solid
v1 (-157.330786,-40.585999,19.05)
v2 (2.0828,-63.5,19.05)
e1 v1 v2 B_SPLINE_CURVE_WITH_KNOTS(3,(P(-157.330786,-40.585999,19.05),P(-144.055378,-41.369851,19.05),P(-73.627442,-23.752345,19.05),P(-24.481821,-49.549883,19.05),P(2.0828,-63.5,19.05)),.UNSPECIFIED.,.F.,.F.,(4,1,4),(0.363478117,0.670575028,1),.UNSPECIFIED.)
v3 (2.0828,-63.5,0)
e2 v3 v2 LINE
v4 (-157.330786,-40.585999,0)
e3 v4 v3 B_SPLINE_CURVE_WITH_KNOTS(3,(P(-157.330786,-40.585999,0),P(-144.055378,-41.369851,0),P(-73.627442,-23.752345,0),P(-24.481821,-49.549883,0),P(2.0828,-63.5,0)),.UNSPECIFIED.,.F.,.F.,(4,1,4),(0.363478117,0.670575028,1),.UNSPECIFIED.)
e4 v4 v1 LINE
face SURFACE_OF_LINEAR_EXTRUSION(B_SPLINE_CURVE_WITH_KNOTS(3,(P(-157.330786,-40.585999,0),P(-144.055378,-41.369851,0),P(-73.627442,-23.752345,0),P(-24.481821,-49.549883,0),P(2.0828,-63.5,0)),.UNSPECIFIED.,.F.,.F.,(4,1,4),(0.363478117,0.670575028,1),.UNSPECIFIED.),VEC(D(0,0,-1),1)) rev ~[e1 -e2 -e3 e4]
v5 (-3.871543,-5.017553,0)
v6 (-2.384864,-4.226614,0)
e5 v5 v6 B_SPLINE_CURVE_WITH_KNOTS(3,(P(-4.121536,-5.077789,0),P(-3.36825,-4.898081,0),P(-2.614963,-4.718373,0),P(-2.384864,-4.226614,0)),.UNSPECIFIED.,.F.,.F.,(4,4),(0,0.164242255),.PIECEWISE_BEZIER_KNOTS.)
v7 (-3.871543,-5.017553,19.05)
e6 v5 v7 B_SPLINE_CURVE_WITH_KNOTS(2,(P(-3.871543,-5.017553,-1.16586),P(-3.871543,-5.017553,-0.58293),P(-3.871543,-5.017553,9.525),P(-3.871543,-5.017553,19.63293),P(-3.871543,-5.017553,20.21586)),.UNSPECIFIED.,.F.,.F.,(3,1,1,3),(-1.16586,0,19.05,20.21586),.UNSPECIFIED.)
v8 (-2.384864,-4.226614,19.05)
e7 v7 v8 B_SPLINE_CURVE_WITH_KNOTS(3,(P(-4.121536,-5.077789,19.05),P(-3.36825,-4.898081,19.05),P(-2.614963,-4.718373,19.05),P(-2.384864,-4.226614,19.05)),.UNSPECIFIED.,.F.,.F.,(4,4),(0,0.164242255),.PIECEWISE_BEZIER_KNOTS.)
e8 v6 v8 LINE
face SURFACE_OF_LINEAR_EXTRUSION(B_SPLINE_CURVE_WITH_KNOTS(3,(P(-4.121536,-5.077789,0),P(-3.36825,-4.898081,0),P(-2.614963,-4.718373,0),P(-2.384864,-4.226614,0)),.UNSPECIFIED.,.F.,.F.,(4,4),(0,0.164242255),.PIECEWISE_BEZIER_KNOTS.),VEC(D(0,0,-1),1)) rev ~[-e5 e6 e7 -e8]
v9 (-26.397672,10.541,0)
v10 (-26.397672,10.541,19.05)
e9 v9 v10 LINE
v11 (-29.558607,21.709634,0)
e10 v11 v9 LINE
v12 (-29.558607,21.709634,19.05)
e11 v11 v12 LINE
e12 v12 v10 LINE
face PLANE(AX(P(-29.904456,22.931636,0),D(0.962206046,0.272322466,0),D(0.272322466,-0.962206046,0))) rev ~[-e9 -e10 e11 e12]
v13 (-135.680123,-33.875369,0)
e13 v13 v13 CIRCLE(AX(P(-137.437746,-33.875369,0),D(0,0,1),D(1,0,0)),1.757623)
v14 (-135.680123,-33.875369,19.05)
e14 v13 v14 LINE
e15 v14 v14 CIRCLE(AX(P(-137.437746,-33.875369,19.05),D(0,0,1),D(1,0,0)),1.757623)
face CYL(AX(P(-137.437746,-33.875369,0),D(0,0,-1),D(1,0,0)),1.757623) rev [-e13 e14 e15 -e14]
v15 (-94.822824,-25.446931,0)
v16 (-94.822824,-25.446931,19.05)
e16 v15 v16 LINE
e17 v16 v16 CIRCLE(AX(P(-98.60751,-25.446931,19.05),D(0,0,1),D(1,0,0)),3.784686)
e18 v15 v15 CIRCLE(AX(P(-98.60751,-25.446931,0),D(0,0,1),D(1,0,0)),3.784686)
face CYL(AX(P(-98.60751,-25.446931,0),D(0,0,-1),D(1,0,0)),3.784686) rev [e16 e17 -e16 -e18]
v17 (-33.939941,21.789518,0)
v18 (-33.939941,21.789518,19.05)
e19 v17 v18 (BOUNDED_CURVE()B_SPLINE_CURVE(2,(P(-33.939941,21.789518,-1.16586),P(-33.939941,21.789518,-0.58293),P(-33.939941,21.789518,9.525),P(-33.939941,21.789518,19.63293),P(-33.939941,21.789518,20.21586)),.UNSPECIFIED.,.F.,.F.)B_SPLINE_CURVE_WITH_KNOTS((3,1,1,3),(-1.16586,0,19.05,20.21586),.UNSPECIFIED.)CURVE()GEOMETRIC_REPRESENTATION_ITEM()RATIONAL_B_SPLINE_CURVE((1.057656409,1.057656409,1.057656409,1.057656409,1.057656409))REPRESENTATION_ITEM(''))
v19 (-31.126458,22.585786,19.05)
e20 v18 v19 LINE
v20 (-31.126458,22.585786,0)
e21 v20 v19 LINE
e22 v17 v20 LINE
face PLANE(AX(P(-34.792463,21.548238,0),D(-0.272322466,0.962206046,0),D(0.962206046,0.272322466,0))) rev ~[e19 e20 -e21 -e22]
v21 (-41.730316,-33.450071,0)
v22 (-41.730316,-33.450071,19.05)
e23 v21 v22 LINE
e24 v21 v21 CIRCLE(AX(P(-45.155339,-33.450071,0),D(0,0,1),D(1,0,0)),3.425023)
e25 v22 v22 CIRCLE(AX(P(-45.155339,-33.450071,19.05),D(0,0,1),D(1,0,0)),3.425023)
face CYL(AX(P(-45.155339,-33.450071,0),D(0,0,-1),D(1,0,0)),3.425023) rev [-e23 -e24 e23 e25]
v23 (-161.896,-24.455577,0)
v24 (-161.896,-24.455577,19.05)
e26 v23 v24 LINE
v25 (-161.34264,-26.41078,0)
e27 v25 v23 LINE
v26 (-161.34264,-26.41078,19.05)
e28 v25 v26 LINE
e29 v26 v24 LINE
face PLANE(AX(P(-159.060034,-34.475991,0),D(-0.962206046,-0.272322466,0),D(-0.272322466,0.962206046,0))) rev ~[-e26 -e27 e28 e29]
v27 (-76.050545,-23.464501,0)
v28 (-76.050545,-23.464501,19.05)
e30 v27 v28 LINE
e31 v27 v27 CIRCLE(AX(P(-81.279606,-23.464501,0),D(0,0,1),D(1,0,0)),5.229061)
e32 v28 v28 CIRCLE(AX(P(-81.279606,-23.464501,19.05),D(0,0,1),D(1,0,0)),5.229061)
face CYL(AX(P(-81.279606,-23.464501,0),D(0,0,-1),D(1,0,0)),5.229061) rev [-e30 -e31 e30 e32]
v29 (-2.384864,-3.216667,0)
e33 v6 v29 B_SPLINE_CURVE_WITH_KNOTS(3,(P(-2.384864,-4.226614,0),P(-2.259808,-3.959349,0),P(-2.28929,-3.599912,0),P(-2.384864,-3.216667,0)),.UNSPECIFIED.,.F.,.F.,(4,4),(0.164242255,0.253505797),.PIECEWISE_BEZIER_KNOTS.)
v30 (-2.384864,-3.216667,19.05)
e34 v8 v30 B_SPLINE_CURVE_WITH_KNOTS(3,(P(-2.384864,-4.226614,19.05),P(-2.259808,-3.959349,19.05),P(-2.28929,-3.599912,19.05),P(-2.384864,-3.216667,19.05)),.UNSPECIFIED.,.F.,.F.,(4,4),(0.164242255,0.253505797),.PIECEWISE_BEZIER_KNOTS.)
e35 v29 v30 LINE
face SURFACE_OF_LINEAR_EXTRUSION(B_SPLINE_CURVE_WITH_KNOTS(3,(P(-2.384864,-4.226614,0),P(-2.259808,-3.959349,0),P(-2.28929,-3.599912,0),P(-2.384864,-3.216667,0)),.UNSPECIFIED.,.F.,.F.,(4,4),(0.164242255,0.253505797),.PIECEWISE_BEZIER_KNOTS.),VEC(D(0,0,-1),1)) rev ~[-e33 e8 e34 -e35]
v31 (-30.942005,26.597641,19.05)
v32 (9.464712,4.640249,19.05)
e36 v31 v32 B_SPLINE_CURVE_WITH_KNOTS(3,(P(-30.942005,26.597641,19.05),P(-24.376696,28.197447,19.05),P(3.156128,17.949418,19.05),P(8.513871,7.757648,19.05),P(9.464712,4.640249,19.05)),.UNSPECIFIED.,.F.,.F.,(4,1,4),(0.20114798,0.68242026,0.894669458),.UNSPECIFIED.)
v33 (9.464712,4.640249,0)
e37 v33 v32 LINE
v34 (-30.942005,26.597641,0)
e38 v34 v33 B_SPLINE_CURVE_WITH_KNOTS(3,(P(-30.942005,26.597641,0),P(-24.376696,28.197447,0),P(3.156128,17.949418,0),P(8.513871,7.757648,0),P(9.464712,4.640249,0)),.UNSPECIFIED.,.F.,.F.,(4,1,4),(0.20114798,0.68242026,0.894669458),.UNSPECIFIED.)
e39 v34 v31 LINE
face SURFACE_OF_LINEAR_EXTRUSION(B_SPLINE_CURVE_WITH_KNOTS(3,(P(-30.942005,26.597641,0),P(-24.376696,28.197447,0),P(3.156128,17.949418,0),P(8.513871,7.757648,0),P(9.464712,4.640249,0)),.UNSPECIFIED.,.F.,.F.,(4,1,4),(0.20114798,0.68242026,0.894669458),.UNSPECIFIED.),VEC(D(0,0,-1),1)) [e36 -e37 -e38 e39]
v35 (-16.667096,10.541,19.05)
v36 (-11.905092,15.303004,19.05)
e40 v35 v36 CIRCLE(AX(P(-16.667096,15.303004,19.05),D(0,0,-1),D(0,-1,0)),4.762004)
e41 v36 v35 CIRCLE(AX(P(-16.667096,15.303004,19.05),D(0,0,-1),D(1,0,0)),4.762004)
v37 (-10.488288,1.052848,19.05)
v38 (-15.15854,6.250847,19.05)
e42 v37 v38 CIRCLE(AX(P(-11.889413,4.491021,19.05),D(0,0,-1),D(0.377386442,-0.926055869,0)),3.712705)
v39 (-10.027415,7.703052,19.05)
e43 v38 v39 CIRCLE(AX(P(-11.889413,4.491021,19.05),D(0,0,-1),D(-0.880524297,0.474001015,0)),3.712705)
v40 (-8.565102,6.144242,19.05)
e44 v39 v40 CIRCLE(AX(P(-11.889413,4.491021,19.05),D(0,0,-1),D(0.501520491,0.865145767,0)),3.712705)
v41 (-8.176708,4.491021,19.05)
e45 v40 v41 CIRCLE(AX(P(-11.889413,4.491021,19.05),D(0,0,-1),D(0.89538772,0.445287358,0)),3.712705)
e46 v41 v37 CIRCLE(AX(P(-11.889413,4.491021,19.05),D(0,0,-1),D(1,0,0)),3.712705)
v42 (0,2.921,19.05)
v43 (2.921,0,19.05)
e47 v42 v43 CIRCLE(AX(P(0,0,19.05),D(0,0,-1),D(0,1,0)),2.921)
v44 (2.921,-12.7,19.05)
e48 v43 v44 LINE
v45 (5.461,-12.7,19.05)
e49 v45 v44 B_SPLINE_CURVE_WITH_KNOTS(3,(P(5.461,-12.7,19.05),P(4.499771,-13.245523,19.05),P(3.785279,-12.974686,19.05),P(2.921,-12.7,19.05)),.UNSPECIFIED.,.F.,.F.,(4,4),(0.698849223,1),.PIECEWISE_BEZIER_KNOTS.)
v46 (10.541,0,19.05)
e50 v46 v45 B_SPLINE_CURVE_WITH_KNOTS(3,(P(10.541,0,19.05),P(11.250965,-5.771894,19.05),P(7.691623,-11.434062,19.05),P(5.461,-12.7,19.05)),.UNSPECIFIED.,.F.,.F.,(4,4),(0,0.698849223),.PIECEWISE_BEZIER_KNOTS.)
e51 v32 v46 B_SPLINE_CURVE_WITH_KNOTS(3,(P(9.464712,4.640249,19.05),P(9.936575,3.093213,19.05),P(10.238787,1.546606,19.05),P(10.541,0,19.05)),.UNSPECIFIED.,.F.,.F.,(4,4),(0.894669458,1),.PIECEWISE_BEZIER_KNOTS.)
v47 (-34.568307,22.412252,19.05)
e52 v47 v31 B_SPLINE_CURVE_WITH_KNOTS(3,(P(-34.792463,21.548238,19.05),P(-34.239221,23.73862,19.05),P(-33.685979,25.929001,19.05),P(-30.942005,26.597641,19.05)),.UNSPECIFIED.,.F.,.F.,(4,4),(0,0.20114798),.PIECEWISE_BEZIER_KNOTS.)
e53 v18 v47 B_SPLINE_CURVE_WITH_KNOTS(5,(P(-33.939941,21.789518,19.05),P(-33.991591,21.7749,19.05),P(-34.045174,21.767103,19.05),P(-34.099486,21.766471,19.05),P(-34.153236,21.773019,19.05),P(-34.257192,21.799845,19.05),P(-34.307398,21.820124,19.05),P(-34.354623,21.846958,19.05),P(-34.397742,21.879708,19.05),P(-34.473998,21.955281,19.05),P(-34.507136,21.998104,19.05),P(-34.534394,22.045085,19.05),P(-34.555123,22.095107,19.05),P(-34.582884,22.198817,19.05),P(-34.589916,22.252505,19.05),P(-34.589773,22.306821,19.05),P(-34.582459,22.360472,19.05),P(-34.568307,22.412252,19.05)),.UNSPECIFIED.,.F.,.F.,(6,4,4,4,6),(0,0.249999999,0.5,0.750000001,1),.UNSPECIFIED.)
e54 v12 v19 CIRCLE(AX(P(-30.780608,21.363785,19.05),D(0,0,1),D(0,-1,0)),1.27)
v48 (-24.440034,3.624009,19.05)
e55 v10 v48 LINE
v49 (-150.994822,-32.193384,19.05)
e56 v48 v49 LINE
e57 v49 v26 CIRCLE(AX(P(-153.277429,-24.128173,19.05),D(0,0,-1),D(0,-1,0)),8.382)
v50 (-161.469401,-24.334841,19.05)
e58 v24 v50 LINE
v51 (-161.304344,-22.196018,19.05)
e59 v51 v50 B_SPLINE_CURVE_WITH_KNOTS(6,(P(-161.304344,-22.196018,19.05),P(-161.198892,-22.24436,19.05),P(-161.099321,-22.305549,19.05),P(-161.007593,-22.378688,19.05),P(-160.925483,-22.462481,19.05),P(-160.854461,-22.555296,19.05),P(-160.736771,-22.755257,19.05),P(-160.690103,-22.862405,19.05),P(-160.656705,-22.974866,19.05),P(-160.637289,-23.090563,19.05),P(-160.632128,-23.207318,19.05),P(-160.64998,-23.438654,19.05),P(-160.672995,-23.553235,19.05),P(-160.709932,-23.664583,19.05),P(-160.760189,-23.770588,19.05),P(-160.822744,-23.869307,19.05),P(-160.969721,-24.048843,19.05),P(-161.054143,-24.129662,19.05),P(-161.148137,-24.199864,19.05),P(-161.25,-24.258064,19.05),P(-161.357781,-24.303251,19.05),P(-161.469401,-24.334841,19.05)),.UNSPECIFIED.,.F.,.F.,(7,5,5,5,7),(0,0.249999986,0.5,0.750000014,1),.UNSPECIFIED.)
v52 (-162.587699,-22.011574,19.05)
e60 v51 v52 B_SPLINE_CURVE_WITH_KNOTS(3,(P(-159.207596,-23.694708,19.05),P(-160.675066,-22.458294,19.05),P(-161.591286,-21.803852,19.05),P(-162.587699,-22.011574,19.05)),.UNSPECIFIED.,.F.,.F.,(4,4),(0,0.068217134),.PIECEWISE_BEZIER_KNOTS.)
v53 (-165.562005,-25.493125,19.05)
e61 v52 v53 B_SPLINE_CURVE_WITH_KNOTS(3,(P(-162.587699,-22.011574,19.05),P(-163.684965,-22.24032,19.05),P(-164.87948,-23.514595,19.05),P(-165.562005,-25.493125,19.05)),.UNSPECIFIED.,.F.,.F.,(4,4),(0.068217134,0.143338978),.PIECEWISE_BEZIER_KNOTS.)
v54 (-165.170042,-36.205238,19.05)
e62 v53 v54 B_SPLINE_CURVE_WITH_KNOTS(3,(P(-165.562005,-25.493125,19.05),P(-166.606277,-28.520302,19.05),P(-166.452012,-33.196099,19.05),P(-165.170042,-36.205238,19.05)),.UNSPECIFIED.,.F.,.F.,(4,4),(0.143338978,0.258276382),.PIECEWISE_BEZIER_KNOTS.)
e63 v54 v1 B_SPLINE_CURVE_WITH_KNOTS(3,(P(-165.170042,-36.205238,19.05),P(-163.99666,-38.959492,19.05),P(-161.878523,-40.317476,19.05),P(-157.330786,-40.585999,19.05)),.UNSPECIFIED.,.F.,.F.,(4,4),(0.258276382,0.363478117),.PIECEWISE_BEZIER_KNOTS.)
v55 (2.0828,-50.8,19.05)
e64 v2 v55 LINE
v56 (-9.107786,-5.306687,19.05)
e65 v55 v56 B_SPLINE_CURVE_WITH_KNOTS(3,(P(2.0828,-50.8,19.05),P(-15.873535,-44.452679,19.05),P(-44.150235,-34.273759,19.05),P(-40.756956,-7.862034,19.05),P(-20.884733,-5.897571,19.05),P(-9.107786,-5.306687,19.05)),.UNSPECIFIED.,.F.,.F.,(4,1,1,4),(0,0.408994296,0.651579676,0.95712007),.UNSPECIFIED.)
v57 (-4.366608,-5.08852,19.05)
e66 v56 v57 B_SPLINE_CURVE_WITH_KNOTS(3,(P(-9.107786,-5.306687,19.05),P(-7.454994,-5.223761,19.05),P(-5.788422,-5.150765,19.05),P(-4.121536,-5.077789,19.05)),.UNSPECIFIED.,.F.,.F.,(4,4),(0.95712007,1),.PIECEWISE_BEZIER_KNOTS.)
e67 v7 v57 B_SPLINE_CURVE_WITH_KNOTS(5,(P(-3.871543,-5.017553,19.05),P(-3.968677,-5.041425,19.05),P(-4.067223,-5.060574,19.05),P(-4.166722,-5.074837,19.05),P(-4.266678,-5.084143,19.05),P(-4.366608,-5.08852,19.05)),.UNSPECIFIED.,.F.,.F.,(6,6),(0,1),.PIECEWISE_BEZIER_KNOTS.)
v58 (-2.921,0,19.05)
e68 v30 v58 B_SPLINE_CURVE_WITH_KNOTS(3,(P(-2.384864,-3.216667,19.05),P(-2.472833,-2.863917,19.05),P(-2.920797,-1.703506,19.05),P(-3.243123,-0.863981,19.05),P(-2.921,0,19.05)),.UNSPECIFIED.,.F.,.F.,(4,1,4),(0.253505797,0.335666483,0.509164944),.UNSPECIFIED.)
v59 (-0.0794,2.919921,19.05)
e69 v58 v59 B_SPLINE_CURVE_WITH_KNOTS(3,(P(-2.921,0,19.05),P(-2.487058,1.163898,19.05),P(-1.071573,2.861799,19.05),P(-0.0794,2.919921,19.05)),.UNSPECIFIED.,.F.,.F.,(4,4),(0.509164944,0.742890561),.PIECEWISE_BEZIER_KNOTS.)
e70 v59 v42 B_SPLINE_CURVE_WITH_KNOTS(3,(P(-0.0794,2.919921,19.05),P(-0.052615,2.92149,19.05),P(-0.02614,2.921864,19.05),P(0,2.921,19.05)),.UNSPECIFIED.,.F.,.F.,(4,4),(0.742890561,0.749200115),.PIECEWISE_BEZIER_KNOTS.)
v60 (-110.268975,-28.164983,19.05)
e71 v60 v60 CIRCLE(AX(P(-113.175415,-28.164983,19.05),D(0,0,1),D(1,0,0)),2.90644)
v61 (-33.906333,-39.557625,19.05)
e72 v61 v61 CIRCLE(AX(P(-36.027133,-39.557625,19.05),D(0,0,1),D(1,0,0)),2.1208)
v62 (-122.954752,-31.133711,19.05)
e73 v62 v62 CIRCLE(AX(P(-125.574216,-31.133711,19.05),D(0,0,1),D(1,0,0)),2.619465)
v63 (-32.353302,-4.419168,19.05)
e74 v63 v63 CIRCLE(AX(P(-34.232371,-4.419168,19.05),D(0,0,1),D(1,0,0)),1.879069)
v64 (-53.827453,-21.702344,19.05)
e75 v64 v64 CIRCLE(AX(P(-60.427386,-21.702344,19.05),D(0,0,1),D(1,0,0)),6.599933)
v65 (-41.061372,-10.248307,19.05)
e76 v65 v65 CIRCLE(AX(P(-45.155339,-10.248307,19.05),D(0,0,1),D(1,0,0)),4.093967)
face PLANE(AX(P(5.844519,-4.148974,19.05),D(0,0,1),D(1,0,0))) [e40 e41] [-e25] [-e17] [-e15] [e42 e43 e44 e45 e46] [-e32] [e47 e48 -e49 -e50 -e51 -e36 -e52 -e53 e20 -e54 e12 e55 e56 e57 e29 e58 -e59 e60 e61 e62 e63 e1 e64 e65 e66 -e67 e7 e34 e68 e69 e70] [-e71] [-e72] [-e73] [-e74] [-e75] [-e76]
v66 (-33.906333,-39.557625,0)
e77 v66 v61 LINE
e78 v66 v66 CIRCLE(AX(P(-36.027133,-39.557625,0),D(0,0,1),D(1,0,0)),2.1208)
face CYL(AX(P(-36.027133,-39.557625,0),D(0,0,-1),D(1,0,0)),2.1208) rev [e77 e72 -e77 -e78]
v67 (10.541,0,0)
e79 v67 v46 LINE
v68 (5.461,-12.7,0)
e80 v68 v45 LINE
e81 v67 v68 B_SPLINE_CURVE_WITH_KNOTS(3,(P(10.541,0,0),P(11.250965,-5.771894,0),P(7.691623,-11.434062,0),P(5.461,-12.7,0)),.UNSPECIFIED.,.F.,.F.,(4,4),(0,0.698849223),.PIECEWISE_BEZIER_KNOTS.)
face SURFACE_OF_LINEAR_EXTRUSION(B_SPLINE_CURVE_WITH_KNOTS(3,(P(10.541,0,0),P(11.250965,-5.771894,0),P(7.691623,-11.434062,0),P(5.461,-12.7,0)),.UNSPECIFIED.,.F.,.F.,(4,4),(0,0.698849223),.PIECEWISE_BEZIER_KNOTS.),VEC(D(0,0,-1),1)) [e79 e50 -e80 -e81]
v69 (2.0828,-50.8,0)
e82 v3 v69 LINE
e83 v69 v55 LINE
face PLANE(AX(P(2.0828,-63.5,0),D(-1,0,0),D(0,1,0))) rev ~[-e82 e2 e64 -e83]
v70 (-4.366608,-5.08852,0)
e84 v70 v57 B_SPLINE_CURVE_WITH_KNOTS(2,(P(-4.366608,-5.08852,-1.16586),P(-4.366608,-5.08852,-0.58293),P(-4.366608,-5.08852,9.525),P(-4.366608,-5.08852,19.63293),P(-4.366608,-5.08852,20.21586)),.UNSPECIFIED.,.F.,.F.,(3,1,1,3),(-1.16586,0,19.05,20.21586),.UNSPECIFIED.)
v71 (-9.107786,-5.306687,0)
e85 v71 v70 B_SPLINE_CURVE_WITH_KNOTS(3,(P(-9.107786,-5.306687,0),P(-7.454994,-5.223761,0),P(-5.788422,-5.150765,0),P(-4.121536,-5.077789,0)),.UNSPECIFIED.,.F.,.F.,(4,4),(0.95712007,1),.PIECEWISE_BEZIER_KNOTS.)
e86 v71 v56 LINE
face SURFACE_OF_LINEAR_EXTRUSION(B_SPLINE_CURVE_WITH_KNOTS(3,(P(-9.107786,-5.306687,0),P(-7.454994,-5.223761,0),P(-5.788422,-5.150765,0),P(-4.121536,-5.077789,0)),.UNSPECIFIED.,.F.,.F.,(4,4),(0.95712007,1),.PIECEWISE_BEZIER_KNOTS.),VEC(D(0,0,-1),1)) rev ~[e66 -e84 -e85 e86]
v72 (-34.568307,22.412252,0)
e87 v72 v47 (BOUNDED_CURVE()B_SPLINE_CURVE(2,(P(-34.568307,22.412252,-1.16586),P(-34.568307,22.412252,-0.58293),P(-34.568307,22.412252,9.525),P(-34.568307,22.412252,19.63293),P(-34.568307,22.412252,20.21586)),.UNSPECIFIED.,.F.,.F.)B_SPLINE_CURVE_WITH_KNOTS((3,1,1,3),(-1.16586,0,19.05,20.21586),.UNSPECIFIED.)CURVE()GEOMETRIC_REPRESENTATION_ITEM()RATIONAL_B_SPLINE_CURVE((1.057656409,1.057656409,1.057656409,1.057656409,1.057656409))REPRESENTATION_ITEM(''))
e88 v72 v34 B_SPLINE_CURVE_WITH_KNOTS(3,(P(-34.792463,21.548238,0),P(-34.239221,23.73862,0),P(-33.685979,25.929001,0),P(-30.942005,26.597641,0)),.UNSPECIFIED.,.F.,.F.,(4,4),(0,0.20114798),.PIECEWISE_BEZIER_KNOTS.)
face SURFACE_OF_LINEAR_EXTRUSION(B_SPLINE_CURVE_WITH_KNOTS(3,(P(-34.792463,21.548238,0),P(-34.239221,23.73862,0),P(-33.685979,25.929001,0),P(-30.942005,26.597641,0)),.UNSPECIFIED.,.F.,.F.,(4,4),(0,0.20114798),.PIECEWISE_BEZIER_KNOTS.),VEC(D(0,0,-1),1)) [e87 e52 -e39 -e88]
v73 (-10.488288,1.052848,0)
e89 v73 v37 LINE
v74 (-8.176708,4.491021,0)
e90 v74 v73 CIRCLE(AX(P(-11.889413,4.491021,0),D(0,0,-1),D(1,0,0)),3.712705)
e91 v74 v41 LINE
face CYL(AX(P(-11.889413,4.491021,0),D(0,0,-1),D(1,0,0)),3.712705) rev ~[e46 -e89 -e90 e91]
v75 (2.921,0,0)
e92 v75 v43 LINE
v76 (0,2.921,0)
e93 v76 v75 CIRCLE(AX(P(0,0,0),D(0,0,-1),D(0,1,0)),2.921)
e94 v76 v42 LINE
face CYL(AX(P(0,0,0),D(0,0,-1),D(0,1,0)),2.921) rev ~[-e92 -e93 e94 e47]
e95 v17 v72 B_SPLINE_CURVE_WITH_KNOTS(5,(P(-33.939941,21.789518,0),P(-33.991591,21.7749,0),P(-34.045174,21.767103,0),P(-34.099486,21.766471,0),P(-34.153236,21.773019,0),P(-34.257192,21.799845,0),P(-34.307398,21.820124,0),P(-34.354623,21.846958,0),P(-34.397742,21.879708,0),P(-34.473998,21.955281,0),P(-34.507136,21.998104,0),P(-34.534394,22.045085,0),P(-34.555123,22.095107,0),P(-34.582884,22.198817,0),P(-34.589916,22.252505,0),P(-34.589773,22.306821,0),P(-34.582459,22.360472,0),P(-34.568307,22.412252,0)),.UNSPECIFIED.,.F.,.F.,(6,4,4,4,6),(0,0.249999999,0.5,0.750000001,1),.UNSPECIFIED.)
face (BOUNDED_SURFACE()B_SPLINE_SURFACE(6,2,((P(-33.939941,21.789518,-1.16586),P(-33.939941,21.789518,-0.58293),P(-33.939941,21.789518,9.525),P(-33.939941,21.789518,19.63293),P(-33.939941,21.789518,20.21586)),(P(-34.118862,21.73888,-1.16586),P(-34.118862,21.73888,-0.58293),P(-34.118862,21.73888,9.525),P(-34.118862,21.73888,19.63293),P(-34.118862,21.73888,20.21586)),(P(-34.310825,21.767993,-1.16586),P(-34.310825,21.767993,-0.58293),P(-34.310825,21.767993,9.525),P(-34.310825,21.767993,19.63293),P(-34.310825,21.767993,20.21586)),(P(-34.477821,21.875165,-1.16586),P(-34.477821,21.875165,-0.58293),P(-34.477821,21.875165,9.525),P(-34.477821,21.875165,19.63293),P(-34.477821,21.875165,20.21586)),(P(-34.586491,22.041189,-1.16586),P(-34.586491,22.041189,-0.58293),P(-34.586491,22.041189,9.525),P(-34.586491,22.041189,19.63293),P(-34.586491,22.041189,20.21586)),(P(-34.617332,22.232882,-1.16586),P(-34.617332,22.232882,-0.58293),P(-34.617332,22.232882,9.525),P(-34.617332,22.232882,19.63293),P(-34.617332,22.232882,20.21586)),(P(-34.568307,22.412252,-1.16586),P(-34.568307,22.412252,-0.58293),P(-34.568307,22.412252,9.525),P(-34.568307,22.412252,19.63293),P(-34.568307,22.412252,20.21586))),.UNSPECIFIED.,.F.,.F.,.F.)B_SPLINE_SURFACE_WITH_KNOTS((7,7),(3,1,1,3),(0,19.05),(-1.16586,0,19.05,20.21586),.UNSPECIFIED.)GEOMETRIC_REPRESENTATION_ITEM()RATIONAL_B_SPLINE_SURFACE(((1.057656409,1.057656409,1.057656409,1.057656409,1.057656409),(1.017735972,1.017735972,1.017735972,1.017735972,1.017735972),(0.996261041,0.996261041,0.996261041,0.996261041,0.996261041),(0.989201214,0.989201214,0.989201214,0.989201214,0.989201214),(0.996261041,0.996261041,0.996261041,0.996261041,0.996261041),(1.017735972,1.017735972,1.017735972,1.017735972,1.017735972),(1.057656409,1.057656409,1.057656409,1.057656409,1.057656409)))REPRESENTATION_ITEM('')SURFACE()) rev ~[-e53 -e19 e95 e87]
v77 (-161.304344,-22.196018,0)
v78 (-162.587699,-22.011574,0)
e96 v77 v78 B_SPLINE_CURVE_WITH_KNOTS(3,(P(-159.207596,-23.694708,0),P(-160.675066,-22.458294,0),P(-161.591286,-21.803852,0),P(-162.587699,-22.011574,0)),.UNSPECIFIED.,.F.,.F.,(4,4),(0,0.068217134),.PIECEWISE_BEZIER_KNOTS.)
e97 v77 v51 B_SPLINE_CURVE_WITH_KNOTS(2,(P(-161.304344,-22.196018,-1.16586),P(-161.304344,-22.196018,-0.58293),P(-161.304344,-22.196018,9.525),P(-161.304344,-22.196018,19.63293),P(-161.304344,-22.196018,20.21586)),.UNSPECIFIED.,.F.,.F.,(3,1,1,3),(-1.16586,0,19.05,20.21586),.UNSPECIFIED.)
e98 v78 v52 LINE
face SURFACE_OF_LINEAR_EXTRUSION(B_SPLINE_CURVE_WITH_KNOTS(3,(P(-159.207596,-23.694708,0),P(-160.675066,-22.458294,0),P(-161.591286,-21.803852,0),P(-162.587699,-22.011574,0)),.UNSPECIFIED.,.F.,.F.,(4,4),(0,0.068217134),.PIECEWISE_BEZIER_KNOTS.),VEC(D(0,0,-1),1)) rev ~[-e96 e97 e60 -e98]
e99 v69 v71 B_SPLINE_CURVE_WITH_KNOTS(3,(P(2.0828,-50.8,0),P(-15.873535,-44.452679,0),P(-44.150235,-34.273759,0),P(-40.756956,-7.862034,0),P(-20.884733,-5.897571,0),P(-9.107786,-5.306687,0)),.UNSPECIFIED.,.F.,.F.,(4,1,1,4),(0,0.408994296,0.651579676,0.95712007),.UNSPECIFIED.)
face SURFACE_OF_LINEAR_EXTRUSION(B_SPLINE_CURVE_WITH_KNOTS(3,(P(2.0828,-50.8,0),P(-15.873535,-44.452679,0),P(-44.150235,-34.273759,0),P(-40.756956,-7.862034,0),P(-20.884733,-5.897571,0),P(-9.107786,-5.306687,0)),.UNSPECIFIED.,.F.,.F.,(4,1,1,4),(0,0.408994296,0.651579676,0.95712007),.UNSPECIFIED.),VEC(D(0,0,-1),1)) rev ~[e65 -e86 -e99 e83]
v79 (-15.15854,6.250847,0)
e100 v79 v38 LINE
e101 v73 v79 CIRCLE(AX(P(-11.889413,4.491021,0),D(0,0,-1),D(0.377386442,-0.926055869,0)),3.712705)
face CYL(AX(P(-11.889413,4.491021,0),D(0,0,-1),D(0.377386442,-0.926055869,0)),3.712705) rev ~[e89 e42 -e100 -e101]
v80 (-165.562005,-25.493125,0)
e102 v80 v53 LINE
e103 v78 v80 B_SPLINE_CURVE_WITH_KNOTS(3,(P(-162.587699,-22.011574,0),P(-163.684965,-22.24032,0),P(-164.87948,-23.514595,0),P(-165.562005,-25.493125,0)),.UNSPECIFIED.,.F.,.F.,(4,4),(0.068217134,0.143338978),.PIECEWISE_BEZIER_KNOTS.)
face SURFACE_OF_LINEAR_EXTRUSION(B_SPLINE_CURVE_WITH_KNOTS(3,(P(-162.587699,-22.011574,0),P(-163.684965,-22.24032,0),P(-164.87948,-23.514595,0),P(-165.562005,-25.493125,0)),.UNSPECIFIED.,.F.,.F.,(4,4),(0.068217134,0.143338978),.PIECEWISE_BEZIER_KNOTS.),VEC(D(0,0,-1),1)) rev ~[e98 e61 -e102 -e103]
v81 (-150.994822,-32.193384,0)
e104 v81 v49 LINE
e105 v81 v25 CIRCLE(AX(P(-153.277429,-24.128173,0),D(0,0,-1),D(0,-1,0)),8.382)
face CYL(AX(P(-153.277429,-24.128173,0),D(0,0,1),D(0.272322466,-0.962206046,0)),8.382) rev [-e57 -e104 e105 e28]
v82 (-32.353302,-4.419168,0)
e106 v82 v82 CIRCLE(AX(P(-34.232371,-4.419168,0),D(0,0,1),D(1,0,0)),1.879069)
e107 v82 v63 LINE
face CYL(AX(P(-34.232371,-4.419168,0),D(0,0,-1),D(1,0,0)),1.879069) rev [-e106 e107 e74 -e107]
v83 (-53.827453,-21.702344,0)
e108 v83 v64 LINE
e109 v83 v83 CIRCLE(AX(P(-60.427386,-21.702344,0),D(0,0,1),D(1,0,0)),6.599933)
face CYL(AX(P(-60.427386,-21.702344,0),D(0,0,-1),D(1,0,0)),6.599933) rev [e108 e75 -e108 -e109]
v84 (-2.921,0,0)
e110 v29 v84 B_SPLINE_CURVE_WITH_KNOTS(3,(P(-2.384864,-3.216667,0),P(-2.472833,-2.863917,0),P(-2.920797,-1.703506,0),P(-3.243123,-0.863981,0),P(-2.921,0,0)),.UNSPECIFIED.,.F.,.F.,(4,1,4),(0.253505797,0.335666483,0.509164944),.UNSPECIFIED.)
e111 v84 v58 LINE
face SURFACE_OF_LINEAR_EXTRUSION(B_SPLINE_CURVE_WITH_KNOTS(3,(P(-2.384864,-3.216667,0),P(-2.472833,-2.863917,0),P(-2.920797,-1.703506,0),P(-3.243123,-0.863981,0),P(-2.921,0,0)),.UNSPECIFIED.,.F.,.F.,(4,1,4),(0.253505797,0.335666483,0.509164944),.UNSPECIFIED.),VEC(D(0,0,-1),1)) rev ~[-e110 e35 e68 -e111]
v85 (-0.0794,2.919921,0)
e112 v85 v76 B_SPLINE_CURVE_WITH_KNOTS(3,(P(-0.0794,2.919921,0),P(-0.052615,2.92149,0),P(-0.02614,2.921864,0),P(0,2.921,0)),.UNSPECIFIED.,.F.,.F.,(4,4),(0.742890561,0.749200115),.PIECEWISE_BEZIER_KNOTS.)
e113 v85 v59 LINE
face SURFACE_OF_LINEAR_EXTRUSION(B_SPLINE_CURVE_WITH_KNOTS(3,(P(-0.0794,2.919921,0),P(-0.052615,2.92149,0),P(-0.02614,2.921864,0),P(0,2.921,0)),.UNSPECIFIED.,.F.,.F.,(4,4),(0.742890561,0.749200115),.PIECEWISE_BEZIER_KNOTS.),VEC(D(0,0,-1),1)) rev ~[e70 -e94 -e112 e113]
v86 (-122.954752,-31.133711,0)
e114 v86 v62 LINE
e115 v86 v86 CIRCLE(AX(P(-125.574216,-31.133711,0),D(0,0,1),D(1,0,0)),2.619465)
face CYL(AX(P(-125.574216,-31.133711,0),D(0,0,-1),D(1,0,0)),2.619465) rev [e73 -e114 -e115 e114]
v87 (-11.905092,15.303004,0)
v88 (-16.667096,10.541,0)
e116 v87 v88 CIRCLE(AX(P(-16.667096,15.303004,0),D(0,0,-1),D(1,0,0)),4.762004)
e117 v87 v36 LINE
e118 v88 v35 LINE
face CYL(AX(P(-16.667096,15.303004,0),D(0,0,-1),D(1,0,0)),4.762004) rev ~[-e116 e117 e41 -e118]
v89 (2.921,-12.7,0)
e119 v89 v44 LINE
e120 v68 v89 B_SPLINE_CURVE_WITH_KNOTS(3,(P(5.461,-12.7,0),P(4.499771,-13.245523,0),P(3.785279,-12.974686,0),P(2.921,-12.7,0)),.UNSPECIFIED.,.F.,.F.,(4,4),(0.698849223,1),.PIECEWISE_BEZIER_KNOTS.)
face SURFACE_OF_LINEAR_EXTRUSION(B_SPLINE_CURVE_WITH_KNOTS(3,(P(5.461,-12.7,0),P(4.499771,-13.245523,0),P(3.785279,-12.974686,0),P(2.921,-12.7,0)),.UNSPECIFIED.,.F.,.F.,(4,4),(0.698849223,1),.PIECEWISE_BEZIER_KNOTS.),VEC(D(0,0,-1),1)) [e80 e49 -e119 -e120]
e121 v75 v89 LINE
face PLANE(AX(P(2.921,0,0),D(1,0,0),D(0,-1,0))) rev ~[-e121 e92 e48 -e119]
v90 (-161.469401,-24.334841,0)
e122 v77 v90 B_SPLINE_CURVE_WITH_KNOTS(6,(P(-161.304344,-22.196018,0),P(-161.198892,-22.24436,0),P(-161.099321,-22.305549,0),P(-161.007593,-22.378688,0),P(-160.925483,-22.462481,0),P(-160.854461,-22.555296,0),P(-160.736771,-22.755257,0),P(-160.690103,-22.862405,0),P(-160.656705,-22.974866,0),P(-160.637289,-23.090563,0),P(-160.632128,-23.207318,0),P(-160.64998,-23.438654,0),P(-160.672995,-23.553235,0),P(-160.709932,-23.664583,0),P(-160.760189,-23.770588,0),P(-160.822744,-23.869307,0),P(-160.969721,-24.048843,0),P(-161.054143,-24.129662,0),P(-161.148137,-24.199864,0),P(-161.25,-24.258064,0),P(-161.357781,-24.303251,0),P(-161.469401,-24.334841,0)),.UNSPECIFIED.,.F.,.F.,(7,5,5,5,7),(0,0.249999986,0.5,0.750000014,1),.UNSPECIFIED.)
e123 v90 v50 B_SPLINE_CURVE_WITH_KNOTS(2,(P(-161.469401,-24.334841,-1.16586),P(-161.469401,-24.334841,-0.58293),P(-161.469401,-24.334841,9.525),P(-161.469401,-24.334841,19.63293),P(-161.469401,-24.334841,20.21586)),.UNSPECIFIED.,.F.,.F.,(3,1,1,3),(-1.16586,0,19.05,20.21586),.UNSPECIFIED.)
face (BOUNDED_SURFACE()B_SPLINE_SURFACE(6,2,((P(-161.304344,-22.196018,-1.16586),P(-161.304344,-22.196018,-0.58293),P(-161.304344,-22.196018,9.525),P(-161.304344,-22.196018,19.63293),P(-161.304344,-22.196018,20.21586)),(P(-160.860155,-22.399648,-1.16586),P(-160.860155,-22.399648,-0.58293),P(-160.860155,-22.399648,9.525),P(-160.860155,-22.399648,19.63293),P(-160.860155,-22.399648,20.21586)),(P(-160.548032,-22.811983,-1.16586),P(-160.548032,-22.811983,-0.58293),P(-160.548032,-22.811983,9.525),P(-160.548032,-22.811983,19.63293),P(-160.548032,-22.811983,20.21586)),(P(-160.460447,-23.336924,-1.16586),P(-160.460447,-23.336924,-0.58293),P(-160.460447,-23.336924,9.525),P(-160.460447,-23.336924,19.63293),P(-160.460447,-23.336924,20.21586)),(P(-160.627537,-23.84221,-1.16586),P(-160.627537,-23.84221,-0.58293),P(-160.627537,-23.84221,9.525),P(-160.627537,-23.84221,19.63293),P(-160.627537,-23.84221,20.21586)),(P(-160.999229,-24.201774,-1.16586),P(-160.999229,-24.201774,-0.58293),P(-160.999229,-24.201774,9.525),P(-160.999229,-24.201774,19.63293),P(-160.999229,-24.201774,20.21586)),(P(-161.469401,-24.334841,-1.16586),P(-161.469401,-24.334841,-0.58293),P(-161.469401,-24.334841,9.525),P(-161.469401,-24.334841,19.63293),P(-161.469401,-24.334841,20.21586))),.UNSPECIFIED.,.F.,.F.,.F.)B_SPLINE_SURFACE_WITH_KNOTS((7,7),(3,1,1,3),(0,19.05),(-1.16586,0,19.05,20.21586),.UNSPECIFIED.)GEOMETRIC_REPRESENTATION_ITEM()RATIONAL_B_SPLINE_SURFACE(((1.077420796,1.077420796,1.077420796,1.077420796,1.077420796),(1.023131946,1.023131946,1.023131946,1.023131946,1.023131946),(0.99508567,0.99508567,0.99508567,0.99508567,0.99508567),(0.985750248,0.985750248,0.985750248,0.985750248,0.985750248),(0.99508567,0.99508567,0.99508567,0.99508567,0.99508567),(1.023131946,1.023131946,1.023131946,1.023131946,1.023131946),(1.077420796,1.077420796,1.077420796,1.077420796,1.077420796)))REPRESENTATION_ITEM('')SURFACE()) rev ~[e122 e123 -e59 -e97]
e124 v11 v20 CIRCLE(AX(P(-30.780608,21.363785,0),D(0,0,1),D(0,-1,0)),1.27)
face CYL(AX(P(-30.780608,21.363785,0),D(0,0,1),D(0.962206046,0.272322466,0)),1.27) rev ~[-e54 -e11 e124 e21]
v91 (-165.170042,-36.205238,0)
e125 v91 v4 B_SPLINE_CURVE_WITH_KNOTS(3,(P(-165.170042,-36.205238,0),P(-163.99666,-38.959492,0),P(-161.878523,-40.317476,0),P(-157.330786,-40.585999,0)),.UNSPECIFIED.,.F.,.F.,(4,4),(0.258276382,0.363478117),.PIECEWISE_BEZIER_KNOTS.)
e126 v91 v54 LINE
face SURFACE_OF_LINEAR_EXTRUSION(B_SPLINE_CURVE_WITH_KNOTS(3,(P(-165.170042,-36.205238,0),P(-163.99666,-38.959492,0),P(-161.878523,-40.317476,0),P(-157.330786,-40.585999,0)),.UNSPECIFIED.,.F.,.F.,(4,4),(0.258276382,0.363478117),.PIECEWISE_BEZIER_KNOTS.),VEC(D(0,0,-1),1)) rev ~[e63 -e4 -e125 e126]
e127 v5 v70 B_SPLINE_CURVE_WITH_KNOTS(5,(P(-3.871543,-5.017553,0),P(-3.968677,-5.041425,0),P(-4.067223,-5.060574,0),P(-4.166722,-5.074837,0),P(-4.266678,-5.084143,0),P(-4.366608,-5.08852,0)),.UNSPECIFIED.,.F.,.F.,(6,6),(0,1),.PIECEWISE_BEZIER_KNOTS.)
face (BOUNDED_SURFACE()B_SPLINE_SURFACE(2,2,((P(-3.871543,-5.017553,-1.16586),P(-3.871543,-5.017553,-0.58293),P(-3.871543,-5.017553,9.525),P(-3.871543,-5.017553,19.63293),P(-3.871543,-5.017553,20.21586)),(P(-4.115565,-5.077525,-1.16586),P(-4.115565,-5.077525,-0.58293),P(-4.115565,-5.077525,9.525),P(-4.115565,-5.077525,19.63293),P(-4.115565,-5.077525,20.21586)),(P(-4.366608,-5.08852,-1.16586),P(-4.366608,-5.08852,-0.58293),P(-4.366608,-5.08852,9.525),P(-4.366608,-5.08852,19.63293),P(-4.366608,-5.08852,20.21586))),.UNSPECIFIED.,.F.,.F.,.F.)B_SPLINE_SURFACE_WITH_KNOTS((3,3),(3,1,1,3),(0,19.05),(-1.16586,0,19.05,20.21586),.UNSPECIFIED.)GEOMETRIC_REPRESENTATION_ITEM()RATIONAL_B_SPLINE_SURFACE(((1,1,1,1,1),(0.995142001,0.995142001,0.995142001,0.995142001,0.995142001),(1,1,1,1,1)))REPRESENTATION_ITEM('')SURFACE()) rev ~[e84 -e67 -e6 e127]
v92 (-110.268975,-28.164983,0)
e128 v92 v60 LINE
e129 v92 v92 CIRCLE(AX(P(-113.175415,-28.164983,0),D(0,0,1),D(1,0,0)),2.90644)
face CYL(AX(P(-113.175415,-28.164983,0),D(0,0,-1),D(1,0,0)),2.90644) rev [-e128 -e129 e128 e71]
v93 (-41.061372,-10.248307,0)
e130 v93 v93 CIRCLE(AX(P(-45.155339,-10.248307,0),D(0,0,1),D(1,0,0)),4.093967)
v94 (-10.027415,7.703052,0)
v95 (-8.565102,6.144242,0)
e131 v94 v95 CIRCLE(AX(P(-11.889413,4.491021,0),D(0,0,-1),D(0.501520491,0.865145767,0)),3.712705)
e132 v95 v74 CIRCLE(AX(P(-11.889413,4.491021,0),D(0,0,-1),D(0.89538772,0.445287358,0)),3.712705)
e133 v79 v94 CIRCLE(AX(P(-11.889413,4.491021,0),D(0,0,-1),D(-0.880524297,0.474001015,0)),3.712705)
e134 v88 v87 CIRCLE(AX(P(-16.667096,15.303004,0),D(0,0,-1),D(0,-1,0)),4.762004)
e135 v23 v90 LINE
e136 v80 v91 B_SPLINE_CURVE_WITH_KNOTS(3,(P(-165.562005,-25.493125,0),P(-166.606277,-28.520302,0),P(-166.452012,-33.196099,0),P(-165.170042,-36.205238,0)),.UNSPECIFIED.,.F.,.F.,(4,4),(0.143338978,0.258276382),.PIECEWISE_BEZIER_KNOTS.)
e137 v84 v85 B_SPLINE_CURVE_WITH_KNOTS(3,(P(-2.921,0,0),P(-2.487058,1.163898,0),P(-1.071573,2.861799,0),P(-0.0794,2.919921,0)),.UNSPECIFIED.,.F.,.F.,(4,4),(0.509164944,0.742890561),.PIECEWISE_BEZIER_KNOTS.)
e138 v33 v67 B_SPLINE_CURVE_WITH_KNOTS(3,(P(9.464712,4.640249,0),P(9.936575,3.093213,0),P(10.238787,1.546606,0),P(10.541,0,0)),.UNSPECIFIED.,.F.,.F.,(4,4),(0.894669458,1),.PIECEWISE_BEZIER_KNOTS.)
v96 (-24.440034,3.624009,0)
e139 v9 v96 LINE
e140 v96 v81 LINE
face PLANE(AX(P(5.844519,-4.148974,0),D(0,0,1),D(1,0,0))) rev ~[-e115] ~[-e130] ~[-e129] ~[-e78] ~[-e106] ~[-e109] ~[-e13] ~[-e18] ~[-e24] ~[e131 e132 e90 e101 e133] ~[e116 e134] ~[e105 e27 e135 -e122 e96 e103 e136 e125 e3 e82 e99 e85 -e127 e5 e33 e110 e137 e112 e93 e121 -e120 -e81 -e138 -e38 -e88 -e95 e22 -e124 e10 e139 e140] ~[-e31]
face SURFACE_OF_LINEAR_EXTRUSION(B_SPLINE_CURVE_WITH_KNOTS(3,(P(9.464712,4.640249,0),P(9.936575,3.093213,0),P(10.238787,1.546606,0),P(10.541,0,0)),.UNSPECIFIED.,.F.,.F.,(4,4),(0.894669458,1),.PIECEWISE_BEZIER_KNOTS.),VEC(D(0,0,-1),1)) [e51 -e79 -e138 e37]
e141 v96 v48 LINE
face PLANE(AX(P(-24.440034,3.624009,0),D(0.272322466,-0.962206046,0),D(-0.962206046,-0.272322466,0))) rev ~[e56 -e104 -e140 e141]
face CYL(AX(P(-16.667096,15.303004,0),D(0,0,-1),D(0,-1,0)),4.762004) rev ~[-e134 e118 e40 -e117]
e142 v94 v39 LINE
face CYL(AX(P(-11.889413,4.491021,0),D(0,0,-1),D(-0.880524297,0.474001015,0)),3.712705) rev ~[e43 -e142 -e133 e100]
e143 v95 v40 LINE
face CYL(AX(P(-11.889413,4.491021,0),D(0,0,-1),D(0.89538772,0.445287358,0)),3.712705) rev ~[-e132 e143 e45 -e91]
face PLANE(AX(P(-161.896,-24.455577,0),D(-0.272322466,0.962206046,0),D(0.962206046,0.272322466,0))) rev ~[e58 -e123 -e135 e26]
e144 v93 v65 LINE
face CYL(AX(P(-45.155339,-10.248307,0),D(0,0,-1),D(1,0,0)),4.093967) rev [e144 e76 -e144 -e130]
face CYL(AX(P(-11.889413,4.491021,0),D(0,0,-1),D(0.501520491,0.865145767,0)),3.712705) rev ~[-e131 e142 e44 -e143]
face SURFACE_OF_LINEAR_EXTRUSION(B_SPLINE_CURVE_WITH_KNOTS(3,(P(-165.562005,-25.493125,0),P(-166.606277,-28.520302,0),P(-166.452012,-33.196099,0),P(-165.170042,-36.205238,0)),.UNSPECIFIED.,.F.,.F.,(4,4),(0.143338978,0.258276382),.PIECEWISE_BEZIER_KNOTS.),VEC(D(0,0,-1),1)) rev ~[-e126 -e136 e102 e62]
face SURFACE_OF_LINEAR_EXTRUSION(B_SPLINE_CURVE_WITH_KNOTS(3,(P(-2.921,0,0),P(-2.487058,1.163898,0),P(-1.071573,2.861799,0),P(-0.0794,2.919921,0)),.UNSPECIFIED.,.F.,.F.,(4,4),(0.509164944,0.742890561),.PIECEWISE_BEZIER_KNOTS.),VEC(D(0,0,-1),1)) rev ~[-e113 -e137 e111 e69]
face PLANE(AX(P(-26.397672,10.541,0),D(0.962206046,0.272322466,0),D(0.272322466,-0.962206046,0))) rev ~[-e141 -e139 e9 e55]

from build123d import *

# Parameters (mm, degrees)
F0_R     = 1.7576231228
F0_R_2   = 2.6194646955
F0_R_3   = 2.9064395042
F0_R_4   = 3.7846862671
F0_R_5   = 5.2290610065
F0_R_6   = 2.1208004667
F0_R_7   = 3.4250228461
F0_R_8   = 6.5999331713
F0_R_9   = 4.0939669446
F0_R_10  = 1.8790687222
F1_DEPTH = 19.05
F2_R     = 8.382
F3_R     = 1.27
F4_R     = 0.508
F5_R     = 2.54
F6_R     = 1.143


# Not quite as in the source:
# - a feature names something its author has since deleted; it is built from what else it names


with BuildPart() as f1:
    # F0 (on Top) → F1 (new body)
    with BuildSketch(Plane.XY):
        with BuildLine():
            Line((10.541, 0), (2.921, 0))
            Line((2.921, 0), (2.921, -10.128200235))
            ThreePointArc((2.921, -10.128200235), (5.467200091, -9.0123473171), (7.633137931, -7.2696551724))
            Line((7.633137931, -7.2696551724), (10.541, 0))
        make_face()
        with BuildLine():
            ThreePointArc((0, 2.921), (2.0654589078, 2.0654589078), (2.921, 0))
            Line((2.921, 0), (10.541, 0))
            add(Edge.make_bspline(
                [(9.4647116957, 4.6402492947), (9.9365749021, 3.093212593), (10.238787451, 1.5466062965), (10.541, 0)],
                knots=[0.8946694577, 0.8946694577, 0.8946694577, 0.8946694577, 1, 1, 1, 1], degree=3))
            ThreePointArc((9.4647116957, 4.6402492947), (5.5767290227, 8.9449859926), (0, 10.541))
            Line((0, 10.541), (0, 2.921))
        make_face()
        with BuildLine():
            add(Edge.make_bspline(
                [(-2.3848635838, -3.2166666053), (-2.4728326484, -2.8639169674), (-2.9207971155, -1.7035058727), (-3.2431227864, -0.8639813892), (-2.921, 0)],
                knots=[0.2535057974, 0.2535057974, 0.2535057974, 0.2535057974, 0.3356664829, 0.509164944, 0.509164944, 0.509164944, 0.509164944], degree=3))
            ThreePointArc((-2.921, 0), (-2.0933427309, 2.0371934643), (-0.0793997186, 2.9199206641))
            add(Edge.make_bspline(
                [(-0.0793997186, 2.9199206641), (-0.0526154408, 2.921489703), (-0.0261396552, 2.9218637368), (0, 2.921)],
                knots=[0.7428905608, 0.7428905608, 0.7428905608, 0.7428905608, 0.749200115, 0.749200115, 0.749200115, 0.749200115], degree=3))
            Line((0, 2.921), (0, 10.541))
            Line((0, 10.541), (-5.5241232696, 8.977568886))
            ThreePointArc((-5.5241232696, 8.977568886), (-7.185645683, 7.7122744453), (-8.5651021417, 6.1442417191))
            ThreePointArc((-8.5651021417, 6.1442417191), (-8.2751102539, 5.3401365451), (-8.1767075611, 4.4910209253))
            ThreePointArc((-8.1767075611, 4.4910209253), (-8.8083299958, 2.4195216624), (-10.4882883034, 1.0528482629))
            ThreePointArc((-10.4882883034, 1.0528482629), (-10.3010896952, -2.2361198743), (-9.1077855872, -5.3066866025))
            add(Edge.make_bspline(
                [(-9.1077855872, -5.3066866025), (-7.4549936416, -5.2237610648), (-5.7884221322, -5.1507653072), (-4.1215360581, -5.0777890942)],
                knots=[0.9571200697, 0.9571200697, 0.9571200697, 0.9571200697, 1, 1, 1, 1], degree=3))
            add(Edge.make_bspline(
                [(-4.1215360581, -5.0777890942), (-3.3682495324, -4.8980809941), (-2.6149630067, -4.7183728941), (-2.3848635838, -4.2266139709)],
                knots=[0, 0, 0, 0, 0.1642422553, 0.1642422553, 0.1642422553, 0.1642422553], degree=3))
            Line((-2.3848635838, -4.2266139709), (-2.3848635838, -3.2166666053))
        make_face()
        with BuildLine():
            ThreePointArc((-0.0793997186, 2.9199206641), (-2.0933427309, 2.0371934643), (-2.921, 0))
            add(Edge.make_bspline(
                [(-2.921, 0), (-2.4870575516, 1.1638984113), (-1.0715731361, 2.8617985559), (-0.0793997186, 2.9199206641)],
                knots=[0.509164944, 0.509164944, 0.509164944, 0.509164944, 0.7428905608, 0.7428905608, 0.7428905608, 0.7428905608], degree=3))
        make_face()
        with BuildLine():
            add(Edge.make_bspline(
                [(-2.3848635838, -4.2266139709), (-2.2598075227, -3.9593493547), (-2.2892895236, -3.5999117297), (-2.3848635838, -3.2166666053)],
                knots=[0.1642422553, 0.1642422553, 0.1642422553, 0.1642422553, 0.2535057974, 0.2535057974, 0.2535057974, 0.2535057974], degree=3))
            Line((-2.3848635838, -3.2166666053), (-2.3848635838, -4.2266139709))
        make_face()
        with BuildLine():
            ThreePointArc((7.633137931, -7.2696551724), (5.467200091, -9.0123473171), (2.921, -10.128200235))
            Line((2.921, -10.128200235), (2.921, -12.7))
            Line((2.921, -12.7), (5.461, -12.7))
            Line((5.461, -12.7), (7.633137931, -7.2696551724))
        make_face()
        with BuildLine():
            ThreePointArc((7.633137931, -7.2696551724), (9.7870727986, -3.9148291194), (10.541, 0))
            Line((10.541, 0), (7.633137931, -7.2696551724))
        make_face()
        with BuildLine():
            add(Edge.make_bspline(
                [(10.541, 0), (11.2509652972, -5.7718935423), (7.6916234008, -11.4340619195), (5.461, -12.7)],
                knots=[0, 0, 0, 0, 0.6988492234, 0.6988492234, 0.6988492234, 0.6988492234], degree=3))
            ThreePointArc((10.541, 0), (9.7870727986, -3.9148291194), (7.633137931, -7.2696551724))
            Line((7.633137931, -7.2696551724), (5.461, -12.7))
        make_face()
        with BuildLine():
            Line((-16.6670959443, 10.541), (0, 10.541))
            ThreePointArc((0, 10.541), (5.5767290227, 8.9449859926), (9.4647116957, 4.6402492947))
            add(Edge.make_bspline(
                [(-30.9420047574, 26.5976409188), (-24.3766956681, 28.1974465791), (3.1561278341, 17.9494181138), (8.5138708016, 7.7576480258), (9.4647116957, 4.6402492947)],
                knots=[0.2011479798, 0.2011479798, 0.2011479798, 0.2011479798, 0.6824202598, 0.8946694577, 0.8946694577, 0.8946694577, 0.8946694577], degree=3))
            Line((-30.9420047574, 26.5976409188), (-29.9044561627, 22.9316358842))
            Line((-29.9044561627, 22.9316358842), (-26.3976724219, 10.541))
            Line((-26.3976724219, 10.541), (-16.6670959443, 10.541))
        make_face()
        with BuildLine():
            ThreePointArc((-11.9050923426, 15.3030036017), (-13.2998509055, 11.9357585629), (-16.6670959443, 10.541))
            ThreePointArc((-16.6670959443, 10.541), (-20.0343409831, 18.6702486405), (-11.9050923426, 15.3030036017))
        make_face(mode=Mode.SUBTRACT)
        with BuildLine():
            Line((-5.5241232696, 8.977568886), (0, 10.541))
            ThreePointArc((0, 10.541), (-2.870551112, 10.142613929), (-5.5241232696, 8.977568886))
        make_face()
        with BuildLine():
            ThreePointArc((-5.5241232696, 8.977568886), (-2.870551112, 10.142613929), (0, 10.541))
            Line((0, 10.541), (-16.6670959443, 10.541))
            Line((-16.6670959443, 10.541), (-26.3976724219, 10.541))
            Line((-26.3976724219, 10.541), (-24.4400335639, 3.6240093687))
            Line((-24.4400335639, 3.6240093687), (-15.1585403449, 6.2508470722))
            ThreePointArc((-15.1585403449, 6.2508470722), (-12.9004660988, 8.0634085442), (-10.0274151455, 7.7030523173))
            Line((-10.0274151455, 7.7030523173), (-5.5241232696, 8.977568886))
        make_face()
        with BuildLine():
            Line((5.461, -12.7), (2.921, -12.7))
            add(Edge.make_bspline(
                [(5.461, -12.7), (4.4997712444, -13.2455228729), (3.7852793191, -12.9746862741), (2.921, -12.7)],
                knots=[0.6988492234, 0.6988492234, 0.6988492234, 0.6988492234, 1, 1, 1, 1], degree=3))
        make_face()
        with BuildLine():
            add(Edge.make_bspline(
                [(2.0828, -50.8), (-15.8735350331, -44.4526794588), (-44.1502352976, -34.2737591947), (-40.756956224, -7.8620336461), (-20.8847334133, -5.8975714593), (-9.1077855872, -5.3066866025)],
                knots=[0, 0, 0, 0, 0.408994296, 0.651579676, 0.9571200697, 0.9571200697, 0.9571200697, 0.9571200697], degree=3))
            ThreePointArc((-9.1077855872, -5.3066866025), (-10.3010896952, -2.2361198743), (-10.4882883034, 1.0528482629))
            ThreePointArc((-10.4882883034, 1.0528482629), (-14.6511436849, 2.009685541), (-15.1585403449, 6.2508470722))
            Line((-15.1585403449, 6.2508470722), (-24.4400335639, 3.6240093687))
            Line((-24.4400335639, 3.6240093687), (-38.5809545016, -0.3781380665))
            Line((-38.5809545016, -0.3781380665), (-134.62, -27.559))
            Line((-134.62, -27.559), (-159.0600335639, -34.4759906313))
            Line((-159.0600335639, -34.4759906313), (-157.3307859061, -40.5859990223))
            add(Edge.make_bspline(
                [(-157.3307859061, -40.5859990223), (-144.0553777211, -41.3698511276), (-73.62744163, -23.7523445291), (-24.481821439, -49.5498829603), (2.0828, -63.5)],
                knots=[0.3634781173, 0.3634781173, 0.3634781173, 0.3634781173, 0.6705750285, 1, 1, 1, 1], degree=3))
            Line((2.0828, -63.5), (2.0828, -50.8))
        make_face()
        with Locations((-137.4377459288, -33.8753685355)):
            Circle(F0_R, mode=Mode.SUBTRACT)
        with Locations((-125.5742162466, -31.133711338)):
            Circle(F0_R_2, mode=Mode.SUBTRACT)
        with Locations((-113.1754145026, -28.1649827957)):
            Circle(F0_R_3, mode=Mode.SUBTRACT)
        with Locations((-98.6075103283, -25.4469309002)):
            Circle(F0_R_4, mode=Mode.SUBTRACT)
        with Locations((-81.2796056271, -23.4645009041)):
            Circle(F0_R_5, mode=Mode.SUBTRACT)
        with Locations((-36.0271334648, -39.5576246083)):
            Circle(F0_R_6, mode=Mode.SUBTRACT)
        with Locations((-45.155338943, -33.4500707686)):
            Circle(F0_R_7, mode=Mode.SUBTRACT)
        with Locations((-60.4273863137, -21.702343598)):
            Circle(F0_R_8, mode=Mode.SUBTRACT)
        with Locations((-45.155338943, -10.2483071387)):
            Circle(F0_R_9, mode=Mode.SUBTRACT)
        with Locations((-34.2323705554, -4.4191675261)):
            Circle(F0_R_10, mode=Mode.SUBTRACT)
        with BuildLine():
            ThreePointArc((-8.5651021417, 6.1442417191), (-7.185645683, 7.7122744453), (-5.5241232696, 8.977568886))
            Line((-5.5241232696, 8.977568886), (-10.0274151455, 7.7030523173))
            ThreePointArc((-10.0274151455, 7.7030523173), (-9.1816607704, 7.0311507523), (-8.5651021417, 6.1442417191))
        make_face()
        with BuildLine():
            Line((-29.9044561627, 22.9316358842), (-30.9420047574, 26.5976409188))
            add(Edge.make_bspline(
                [(-34.7924628755, 21.5482377579), (-34.2392208548, 23.7386195676), (-33.6859788341, 25.9290013773), (-30.9420047574, 26.5976409188)],
                knots=[0, 0, 0, 0, 0.2011479798, 0.2011479798, 0.2011479798, 0.2011479798], degree=3))
            Line((-34.7924628755, 21.5482377579), (-29.9044561627, 22.9316358842))
        make_face()
        with BuildLine():
            add(Edge.make_bspline(
                [(-165.1700419549, -36.2052382891), (-163.9966596031, -38.9594916297), (-161.8785228938, -40.3174759635), (-157.3307859061, -40.5859990223)],
                knots=[0.2582763817, 0.2582763817, 0.2582763817, 0.2582763817, 0.3634781173, 0.3634781173, 0.3634781173, 0.3634781173], degree=3))
            Line((-157.3307859061, -40.5859990223), (-159.0600335639, -34.4759906313))
            Line((-159.0600335639, -34.4759906313), (-165.1700419549, -36.2052382891))
        make_face()
        with BuildLine():
            Line((-165.1700419549, -36.2052382891), (-159.0600335639, -34.4759906313))
            Line((-159.0600335639, -34.4759906313), (-161.8959997228, -24.4555768701))
            Line((-161.8959997228, -24.4555768701), (-165.5620047574, -25.4931254648))
            add(Edge.make_bspline(
                [(-165.5620047574, -25.4931254648), (-166.6062770263, -28.5203024248), (-166.4520124462, -33.1960985126), (-165.1700419549, -36.2052382891)],
                knots=[0.1433389784, 0.1433389784, 0.1433389784, 0.1433389784, 0.2582763817, 0.2582763817, 0.2582763817, 0.2582763817], degree=3))
        make_face()
        with BuildLine():
            Line((-162.5876987859, -22.0115735137), (-161.8959997228, -24.4555768701))
            Line((-161.8959997228, -24.4555768701), (-159.2075960307, -23.6947079006))
            add(Edge.make_bspline(
                [(-159.2075960307, -23.6947079006), (-160.6750664221, -22.4582941647), (-161.5912860772, -21.8038515678), (-162.5876987859, -22.0115735137)],
                knots=[0, 0, 0, 0, 0.0682171341, 0.0682171341, 0.0682171341, 0.0682171341], degree=3))
        make_face()
        with BuildLine():
            Line((-165.5620047574, -25.4931254648), (-161.8959997228, -24.4555768701))
            Line((-161.8959997228, -24.4555768701), (-162.5876987859, -22.0115735137))
            add(Edge.make_bspline(
                [(-162.5876987859, -22.0115735137), (-163.6849650577, -22.2403203804), (-164.8794796913, -23.5145953285), (-165.5620047574, -25.4931254648)],
                knots=[0.0682171341, 0.0682171341, 0.0682171341, 0.0682171341, 0.1433389784, 0.1433389784, 0.1433389784, 0.1433389784], degree=3))
        make_face()
    extrude(amount=F1_DEPTH)

    # F2
    f2_edges = [f1.edges().sort_by_distance(p)[0] for p in [
        (-159.060034, -34.475991, 9.525),
    ]]
    fillet(f2_edges, radius=F2_R)

    # F3
    f3_edges = [f1.edges().sort_by_distance(p)[0] for p in [
        (-29.904456, 22.931636, 9.525),
    ]]
    fillet(f3_edges, radius=F3_R)

    # F4
    f4_edges = [f1.edges().sort_by_distance(p)[0] for p in [
        (-34.792463, 21.548238, 9.525),
    ]]
    fillet(f4_edges, radius=F4_R)

    # F5
    f5_edges = [f1.edges().sort_by_distance(p)[0] for p in [
        (-4.121536, -5.077789, 9.525),
    ]]
    fillet(f5_edges, radius=F5_R)

    # F6
    f6_edges = [f1.edges().sort_by_distance(p)[0] for p in [
        (-159.207596, -23.694708, 9.525),
    ]]
    fillet(f6_edges, radius=F6_R)


solid = f1.part
